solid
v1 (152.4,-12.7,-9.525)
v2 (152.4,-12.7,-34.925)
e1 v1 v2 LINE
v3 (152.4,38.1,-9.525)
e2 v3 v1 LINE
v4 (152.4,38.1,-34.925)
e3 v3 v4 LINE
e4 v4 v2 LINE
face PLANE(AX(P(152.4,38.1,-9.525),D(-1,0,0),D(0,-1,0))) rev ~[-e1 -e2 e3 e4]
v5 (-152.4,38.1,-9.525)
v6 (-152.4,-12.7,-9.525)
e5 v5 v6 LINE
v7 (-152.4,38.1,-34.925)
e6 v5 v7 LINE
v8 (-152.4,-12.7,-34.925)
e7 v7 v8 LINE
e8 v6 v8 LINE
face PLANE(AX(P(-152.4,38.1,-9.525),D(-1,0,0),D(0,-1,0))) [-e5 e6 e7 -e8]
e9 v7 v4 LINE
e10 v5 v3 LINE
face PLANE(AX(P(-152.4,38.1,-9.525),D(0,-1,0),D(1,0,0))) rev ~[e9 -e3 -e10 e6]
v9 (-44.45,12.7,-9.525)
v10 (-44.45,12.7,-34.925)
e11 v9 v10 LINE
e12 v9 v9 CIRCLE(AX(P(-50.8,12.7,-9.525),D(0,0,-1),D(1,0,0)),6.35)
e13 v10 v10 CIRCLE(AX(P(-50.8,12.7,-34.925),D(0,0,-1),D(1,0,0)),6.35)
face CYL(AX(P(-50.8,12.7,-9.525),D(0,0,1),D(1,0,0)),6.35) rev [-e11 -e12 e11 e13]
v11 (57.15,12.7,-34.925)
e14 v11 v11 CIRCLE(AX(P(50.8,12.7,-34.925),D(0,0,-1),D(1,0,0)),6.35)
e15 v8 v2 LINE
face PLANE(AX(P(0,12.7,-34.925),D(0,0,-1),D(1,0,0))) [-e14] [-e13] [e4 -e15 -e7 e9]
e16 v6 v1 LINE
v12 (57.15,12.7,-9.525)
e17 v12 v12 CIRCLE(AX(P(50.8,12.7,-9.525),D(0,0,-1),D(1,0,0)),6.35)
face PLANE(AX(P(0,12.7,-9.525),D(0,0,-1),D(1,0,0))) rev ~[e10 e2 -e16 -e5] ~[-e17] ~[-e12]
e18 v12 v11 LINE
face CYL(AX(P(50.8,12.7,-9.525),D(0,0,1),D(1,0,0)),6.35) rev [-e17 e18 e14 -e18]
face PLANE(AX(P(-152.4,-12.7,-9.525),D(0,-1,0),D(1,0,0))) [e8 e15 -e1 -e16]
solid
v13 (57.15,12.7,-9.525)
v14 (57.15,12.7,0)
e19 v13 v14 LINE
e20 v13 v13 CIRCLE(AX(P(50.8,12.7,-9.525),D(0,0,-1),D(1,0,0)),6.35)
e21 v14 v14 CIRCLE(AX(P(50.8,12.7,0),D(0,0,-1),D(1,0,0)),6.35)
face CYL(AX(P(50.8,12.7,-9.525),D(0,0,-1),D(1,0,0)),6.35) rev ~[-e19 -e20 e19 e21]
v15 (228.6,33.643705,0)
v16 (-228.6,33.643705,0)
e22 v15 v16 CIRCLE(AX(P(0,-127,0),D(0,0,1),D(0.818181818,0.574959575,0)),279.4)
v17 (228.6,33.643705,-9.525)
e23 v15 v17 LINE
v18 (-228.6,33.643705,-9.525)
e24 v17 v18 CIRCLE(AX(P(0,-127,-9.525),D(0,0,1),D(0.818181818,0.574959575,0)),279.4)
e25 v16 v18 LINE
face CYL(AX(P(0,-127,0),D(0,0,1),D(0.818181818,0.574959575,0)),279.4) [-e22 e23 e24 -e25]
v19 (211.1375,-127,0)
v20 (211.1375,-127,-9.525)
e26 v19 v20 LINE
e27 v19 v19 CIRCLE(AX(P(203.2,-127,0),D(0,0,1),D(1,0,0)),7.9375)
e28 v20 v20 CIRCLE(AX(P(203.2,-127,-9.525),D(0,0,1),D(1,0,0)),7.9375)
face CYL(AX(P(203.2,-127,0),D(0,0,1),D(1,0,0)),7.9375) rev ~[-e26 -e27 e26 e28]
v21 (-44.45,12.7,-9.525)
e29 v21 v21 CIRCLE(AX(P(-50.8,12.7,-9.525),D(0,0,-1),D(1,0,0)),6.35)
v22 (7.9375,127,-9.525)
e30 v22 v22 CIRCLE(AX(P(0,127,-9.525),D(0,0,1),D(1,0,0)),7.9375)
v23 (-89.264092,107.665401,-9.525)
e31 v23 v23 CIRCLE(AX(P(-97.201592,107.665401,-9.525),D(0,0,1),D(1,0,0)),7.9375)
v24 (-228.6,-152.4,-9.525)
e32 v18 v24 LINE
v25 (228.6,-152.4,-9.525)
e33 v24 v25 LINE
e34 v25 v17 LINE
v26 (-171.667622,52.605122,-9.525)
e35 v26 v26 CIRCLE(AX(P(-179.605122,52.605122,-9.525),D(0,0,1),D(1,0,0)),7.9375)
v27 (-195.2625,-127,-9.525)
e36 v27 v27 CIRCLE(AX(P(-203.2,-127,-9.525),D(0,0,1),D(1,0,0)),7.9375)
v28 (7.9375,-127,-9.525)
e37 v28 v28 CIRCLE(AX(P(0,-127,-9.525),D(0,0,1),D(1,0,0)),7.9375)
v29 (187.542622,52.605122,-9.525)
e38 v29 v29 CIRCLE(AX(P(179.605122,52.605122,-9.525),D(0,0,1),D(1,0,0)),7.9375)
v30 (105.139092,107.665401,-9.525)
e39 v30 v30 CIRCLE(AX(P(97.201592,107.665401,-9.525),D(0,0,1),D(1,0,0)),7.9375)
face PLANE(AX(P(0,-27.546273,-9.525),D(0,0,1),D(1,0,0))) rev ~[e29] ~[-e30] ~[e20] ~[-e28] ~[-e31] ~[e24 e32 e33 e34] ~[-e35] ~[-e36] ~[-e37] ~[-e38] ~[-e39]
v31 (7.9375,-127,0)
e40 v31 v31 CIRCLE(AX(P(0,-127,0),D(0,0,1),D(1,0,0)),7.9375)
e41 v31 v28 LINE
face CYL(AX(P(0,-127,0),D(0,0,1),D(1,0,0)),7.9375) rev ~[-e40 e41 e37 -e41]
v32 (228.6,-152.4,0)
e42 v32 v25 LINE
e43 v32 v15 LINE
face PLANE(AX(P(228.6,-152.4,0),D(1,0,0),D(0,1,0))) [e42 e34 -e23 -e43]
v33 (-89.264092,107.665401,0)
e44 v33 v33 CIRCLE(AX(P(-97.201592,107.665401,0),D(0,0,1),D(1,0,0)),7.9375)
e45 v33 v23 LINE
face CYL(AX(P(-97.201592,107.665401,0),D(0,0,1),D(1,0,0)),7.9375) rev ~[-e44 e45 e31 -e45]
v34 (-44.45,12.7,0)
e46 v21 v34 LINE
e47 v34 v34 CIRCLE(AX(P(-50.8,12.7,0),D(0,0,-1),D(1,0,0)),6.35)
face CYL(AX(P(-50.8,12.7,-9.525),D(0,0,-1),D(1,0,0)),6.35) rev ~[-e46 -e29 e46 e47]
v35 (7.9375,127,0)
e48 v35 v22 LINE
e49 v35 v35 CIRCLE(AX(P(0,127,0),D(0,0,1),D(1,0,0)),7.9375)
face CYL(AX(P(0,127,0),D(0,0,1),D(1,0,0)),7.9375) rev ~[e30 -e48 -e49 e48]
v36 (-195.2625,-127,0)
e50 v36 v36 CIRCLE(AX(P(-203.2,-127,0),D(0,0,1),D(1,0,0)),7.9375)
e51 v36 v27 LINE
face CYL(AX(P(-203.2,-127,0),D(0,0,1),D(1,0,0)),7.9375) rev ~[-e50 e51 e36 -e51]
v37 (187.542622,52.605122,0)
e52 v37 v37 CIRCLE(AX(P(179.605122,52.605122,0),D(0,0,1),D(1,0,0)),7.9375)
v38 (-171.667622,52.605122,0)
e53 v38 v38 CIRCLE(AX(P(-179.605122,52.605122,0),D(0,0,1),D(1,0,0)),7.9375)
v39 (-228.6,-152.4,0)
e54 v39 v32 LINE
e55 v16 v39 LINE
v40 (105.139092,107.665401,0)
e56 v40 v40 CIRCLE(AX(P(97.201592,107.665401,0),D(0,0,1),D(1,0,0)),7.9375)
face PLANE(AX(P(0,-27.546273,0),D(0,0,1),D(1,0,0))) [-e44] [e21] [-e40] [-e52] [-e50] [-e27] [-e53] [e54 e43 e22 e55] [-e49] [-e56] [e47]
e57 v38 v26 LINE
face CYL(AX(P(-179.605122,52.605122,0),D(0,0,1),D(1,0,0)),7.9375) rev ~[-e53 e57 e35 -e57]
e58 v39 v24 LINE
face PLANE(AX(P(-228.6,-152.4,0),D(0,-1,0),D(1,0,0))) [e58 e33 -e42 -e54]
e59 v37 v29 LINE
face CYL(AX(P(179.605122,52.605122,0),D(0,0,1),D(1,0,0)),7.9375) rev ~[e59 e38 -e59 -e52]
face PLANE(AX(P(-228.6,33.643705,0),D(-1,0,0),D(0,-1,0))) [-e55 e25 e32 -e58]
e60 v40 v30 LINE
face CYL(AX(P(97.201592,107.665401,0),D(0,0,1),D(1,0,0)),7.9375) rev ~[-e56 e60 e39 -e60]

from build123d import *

# Parameters (mm, degrees)
F0_R     = 7.9375
F1_DEPTH = 9.525
F2_W     = 304.8
F2_H     = 50.8
F2_R     = 6.35
F3_DEPTH = 25.4
F4_DEPTH = 9.526


# Not quite as in the source:
# - a feature names something its author has since deleted; it is built from what else it names


with BuildPart() as f1:
    # F0 (on Top) → F1 (new body)
    with BuildSketch(Plane.XY):
        with BuildLine():
            Line((-228.6, 33.6437051366), (-228.6, -152.4))
            Line((-228.6, -152.4), (228.6, -152.4))
            Line((228.6, -152.4), (228.6, 33.6437051366))
            ThreePointArc((228.6, 33.6437051366), (0, 152.4), (-228.6, 33.6437051366))
        make_face()
        with Locations((-203.2, -127)):
            Circle(F0_R, mode=Mode.SUBTRACT)
        with Locations((0, -127)):
            Circle(F0_R, mode=Mode.SUBTRACT)
        with Locations((203.2, -127)):
            Circle(F0_R, mode=Mode.SUBTRACT)
        with Locations((-179.6051224214, 52.6051224214)):
            Circle(F0_R, mode=Mode.SUBTRACT)
        with Locations((-97.2015918207, 107.6654012579)):
            Circle(F0_R, mode=Mode.SUBTRACT)
        with Locations((179.6051224214, 52.6051224214)):
            Circle(F0_R, mode=Mode.SUBTRACT)
        with Locations((97.2015918207, 107.6654012579)):
            Circle(F0_R, mode=Mode.SUBTRACT)
        with Locations((0, 127)):
            Circle(F0_R, mode=Mode.SUBTRACT)
    extrude(amount=-F1_DEPTH)

    # F2 (on face) → F4 (cut, through all)
    with BuildSketch(Plane(origin=(0, 0, -9.525), x_dir=(1, 0, 0), z_dir=(0, 0, -1))):
        with Locations((-50.8, -12.7)):
            Circle(F2_R)
        with Locations((50.8, -12.7)):
            Circle(F2_R)
    extrude(amount=-F4_DEPTH, mode=Mode.SUBTRACT)


with BuildPart() as f3:
    # F2 (on face) → F3 (new body)
    with BuildSketch(Plane(origin=(0, 0, -9.525), x_dir=(1, 0, 0), z_dir=(0, 0, -1))):
        with Locations((0, -12.7)):
            Rectangle(F2_W, F2_H)
        with Locations((-50.8, -12.7)):
            Circle(F2_R, mode=Mode.SUBTRACT)
        with Locations((50.8, -12.7)):
            Circle(F2_R, mode=Mode.SUBTRACT)
    extrude(amount=F3_DEPTH)


solid = Compound([f1.part, f3.part])
